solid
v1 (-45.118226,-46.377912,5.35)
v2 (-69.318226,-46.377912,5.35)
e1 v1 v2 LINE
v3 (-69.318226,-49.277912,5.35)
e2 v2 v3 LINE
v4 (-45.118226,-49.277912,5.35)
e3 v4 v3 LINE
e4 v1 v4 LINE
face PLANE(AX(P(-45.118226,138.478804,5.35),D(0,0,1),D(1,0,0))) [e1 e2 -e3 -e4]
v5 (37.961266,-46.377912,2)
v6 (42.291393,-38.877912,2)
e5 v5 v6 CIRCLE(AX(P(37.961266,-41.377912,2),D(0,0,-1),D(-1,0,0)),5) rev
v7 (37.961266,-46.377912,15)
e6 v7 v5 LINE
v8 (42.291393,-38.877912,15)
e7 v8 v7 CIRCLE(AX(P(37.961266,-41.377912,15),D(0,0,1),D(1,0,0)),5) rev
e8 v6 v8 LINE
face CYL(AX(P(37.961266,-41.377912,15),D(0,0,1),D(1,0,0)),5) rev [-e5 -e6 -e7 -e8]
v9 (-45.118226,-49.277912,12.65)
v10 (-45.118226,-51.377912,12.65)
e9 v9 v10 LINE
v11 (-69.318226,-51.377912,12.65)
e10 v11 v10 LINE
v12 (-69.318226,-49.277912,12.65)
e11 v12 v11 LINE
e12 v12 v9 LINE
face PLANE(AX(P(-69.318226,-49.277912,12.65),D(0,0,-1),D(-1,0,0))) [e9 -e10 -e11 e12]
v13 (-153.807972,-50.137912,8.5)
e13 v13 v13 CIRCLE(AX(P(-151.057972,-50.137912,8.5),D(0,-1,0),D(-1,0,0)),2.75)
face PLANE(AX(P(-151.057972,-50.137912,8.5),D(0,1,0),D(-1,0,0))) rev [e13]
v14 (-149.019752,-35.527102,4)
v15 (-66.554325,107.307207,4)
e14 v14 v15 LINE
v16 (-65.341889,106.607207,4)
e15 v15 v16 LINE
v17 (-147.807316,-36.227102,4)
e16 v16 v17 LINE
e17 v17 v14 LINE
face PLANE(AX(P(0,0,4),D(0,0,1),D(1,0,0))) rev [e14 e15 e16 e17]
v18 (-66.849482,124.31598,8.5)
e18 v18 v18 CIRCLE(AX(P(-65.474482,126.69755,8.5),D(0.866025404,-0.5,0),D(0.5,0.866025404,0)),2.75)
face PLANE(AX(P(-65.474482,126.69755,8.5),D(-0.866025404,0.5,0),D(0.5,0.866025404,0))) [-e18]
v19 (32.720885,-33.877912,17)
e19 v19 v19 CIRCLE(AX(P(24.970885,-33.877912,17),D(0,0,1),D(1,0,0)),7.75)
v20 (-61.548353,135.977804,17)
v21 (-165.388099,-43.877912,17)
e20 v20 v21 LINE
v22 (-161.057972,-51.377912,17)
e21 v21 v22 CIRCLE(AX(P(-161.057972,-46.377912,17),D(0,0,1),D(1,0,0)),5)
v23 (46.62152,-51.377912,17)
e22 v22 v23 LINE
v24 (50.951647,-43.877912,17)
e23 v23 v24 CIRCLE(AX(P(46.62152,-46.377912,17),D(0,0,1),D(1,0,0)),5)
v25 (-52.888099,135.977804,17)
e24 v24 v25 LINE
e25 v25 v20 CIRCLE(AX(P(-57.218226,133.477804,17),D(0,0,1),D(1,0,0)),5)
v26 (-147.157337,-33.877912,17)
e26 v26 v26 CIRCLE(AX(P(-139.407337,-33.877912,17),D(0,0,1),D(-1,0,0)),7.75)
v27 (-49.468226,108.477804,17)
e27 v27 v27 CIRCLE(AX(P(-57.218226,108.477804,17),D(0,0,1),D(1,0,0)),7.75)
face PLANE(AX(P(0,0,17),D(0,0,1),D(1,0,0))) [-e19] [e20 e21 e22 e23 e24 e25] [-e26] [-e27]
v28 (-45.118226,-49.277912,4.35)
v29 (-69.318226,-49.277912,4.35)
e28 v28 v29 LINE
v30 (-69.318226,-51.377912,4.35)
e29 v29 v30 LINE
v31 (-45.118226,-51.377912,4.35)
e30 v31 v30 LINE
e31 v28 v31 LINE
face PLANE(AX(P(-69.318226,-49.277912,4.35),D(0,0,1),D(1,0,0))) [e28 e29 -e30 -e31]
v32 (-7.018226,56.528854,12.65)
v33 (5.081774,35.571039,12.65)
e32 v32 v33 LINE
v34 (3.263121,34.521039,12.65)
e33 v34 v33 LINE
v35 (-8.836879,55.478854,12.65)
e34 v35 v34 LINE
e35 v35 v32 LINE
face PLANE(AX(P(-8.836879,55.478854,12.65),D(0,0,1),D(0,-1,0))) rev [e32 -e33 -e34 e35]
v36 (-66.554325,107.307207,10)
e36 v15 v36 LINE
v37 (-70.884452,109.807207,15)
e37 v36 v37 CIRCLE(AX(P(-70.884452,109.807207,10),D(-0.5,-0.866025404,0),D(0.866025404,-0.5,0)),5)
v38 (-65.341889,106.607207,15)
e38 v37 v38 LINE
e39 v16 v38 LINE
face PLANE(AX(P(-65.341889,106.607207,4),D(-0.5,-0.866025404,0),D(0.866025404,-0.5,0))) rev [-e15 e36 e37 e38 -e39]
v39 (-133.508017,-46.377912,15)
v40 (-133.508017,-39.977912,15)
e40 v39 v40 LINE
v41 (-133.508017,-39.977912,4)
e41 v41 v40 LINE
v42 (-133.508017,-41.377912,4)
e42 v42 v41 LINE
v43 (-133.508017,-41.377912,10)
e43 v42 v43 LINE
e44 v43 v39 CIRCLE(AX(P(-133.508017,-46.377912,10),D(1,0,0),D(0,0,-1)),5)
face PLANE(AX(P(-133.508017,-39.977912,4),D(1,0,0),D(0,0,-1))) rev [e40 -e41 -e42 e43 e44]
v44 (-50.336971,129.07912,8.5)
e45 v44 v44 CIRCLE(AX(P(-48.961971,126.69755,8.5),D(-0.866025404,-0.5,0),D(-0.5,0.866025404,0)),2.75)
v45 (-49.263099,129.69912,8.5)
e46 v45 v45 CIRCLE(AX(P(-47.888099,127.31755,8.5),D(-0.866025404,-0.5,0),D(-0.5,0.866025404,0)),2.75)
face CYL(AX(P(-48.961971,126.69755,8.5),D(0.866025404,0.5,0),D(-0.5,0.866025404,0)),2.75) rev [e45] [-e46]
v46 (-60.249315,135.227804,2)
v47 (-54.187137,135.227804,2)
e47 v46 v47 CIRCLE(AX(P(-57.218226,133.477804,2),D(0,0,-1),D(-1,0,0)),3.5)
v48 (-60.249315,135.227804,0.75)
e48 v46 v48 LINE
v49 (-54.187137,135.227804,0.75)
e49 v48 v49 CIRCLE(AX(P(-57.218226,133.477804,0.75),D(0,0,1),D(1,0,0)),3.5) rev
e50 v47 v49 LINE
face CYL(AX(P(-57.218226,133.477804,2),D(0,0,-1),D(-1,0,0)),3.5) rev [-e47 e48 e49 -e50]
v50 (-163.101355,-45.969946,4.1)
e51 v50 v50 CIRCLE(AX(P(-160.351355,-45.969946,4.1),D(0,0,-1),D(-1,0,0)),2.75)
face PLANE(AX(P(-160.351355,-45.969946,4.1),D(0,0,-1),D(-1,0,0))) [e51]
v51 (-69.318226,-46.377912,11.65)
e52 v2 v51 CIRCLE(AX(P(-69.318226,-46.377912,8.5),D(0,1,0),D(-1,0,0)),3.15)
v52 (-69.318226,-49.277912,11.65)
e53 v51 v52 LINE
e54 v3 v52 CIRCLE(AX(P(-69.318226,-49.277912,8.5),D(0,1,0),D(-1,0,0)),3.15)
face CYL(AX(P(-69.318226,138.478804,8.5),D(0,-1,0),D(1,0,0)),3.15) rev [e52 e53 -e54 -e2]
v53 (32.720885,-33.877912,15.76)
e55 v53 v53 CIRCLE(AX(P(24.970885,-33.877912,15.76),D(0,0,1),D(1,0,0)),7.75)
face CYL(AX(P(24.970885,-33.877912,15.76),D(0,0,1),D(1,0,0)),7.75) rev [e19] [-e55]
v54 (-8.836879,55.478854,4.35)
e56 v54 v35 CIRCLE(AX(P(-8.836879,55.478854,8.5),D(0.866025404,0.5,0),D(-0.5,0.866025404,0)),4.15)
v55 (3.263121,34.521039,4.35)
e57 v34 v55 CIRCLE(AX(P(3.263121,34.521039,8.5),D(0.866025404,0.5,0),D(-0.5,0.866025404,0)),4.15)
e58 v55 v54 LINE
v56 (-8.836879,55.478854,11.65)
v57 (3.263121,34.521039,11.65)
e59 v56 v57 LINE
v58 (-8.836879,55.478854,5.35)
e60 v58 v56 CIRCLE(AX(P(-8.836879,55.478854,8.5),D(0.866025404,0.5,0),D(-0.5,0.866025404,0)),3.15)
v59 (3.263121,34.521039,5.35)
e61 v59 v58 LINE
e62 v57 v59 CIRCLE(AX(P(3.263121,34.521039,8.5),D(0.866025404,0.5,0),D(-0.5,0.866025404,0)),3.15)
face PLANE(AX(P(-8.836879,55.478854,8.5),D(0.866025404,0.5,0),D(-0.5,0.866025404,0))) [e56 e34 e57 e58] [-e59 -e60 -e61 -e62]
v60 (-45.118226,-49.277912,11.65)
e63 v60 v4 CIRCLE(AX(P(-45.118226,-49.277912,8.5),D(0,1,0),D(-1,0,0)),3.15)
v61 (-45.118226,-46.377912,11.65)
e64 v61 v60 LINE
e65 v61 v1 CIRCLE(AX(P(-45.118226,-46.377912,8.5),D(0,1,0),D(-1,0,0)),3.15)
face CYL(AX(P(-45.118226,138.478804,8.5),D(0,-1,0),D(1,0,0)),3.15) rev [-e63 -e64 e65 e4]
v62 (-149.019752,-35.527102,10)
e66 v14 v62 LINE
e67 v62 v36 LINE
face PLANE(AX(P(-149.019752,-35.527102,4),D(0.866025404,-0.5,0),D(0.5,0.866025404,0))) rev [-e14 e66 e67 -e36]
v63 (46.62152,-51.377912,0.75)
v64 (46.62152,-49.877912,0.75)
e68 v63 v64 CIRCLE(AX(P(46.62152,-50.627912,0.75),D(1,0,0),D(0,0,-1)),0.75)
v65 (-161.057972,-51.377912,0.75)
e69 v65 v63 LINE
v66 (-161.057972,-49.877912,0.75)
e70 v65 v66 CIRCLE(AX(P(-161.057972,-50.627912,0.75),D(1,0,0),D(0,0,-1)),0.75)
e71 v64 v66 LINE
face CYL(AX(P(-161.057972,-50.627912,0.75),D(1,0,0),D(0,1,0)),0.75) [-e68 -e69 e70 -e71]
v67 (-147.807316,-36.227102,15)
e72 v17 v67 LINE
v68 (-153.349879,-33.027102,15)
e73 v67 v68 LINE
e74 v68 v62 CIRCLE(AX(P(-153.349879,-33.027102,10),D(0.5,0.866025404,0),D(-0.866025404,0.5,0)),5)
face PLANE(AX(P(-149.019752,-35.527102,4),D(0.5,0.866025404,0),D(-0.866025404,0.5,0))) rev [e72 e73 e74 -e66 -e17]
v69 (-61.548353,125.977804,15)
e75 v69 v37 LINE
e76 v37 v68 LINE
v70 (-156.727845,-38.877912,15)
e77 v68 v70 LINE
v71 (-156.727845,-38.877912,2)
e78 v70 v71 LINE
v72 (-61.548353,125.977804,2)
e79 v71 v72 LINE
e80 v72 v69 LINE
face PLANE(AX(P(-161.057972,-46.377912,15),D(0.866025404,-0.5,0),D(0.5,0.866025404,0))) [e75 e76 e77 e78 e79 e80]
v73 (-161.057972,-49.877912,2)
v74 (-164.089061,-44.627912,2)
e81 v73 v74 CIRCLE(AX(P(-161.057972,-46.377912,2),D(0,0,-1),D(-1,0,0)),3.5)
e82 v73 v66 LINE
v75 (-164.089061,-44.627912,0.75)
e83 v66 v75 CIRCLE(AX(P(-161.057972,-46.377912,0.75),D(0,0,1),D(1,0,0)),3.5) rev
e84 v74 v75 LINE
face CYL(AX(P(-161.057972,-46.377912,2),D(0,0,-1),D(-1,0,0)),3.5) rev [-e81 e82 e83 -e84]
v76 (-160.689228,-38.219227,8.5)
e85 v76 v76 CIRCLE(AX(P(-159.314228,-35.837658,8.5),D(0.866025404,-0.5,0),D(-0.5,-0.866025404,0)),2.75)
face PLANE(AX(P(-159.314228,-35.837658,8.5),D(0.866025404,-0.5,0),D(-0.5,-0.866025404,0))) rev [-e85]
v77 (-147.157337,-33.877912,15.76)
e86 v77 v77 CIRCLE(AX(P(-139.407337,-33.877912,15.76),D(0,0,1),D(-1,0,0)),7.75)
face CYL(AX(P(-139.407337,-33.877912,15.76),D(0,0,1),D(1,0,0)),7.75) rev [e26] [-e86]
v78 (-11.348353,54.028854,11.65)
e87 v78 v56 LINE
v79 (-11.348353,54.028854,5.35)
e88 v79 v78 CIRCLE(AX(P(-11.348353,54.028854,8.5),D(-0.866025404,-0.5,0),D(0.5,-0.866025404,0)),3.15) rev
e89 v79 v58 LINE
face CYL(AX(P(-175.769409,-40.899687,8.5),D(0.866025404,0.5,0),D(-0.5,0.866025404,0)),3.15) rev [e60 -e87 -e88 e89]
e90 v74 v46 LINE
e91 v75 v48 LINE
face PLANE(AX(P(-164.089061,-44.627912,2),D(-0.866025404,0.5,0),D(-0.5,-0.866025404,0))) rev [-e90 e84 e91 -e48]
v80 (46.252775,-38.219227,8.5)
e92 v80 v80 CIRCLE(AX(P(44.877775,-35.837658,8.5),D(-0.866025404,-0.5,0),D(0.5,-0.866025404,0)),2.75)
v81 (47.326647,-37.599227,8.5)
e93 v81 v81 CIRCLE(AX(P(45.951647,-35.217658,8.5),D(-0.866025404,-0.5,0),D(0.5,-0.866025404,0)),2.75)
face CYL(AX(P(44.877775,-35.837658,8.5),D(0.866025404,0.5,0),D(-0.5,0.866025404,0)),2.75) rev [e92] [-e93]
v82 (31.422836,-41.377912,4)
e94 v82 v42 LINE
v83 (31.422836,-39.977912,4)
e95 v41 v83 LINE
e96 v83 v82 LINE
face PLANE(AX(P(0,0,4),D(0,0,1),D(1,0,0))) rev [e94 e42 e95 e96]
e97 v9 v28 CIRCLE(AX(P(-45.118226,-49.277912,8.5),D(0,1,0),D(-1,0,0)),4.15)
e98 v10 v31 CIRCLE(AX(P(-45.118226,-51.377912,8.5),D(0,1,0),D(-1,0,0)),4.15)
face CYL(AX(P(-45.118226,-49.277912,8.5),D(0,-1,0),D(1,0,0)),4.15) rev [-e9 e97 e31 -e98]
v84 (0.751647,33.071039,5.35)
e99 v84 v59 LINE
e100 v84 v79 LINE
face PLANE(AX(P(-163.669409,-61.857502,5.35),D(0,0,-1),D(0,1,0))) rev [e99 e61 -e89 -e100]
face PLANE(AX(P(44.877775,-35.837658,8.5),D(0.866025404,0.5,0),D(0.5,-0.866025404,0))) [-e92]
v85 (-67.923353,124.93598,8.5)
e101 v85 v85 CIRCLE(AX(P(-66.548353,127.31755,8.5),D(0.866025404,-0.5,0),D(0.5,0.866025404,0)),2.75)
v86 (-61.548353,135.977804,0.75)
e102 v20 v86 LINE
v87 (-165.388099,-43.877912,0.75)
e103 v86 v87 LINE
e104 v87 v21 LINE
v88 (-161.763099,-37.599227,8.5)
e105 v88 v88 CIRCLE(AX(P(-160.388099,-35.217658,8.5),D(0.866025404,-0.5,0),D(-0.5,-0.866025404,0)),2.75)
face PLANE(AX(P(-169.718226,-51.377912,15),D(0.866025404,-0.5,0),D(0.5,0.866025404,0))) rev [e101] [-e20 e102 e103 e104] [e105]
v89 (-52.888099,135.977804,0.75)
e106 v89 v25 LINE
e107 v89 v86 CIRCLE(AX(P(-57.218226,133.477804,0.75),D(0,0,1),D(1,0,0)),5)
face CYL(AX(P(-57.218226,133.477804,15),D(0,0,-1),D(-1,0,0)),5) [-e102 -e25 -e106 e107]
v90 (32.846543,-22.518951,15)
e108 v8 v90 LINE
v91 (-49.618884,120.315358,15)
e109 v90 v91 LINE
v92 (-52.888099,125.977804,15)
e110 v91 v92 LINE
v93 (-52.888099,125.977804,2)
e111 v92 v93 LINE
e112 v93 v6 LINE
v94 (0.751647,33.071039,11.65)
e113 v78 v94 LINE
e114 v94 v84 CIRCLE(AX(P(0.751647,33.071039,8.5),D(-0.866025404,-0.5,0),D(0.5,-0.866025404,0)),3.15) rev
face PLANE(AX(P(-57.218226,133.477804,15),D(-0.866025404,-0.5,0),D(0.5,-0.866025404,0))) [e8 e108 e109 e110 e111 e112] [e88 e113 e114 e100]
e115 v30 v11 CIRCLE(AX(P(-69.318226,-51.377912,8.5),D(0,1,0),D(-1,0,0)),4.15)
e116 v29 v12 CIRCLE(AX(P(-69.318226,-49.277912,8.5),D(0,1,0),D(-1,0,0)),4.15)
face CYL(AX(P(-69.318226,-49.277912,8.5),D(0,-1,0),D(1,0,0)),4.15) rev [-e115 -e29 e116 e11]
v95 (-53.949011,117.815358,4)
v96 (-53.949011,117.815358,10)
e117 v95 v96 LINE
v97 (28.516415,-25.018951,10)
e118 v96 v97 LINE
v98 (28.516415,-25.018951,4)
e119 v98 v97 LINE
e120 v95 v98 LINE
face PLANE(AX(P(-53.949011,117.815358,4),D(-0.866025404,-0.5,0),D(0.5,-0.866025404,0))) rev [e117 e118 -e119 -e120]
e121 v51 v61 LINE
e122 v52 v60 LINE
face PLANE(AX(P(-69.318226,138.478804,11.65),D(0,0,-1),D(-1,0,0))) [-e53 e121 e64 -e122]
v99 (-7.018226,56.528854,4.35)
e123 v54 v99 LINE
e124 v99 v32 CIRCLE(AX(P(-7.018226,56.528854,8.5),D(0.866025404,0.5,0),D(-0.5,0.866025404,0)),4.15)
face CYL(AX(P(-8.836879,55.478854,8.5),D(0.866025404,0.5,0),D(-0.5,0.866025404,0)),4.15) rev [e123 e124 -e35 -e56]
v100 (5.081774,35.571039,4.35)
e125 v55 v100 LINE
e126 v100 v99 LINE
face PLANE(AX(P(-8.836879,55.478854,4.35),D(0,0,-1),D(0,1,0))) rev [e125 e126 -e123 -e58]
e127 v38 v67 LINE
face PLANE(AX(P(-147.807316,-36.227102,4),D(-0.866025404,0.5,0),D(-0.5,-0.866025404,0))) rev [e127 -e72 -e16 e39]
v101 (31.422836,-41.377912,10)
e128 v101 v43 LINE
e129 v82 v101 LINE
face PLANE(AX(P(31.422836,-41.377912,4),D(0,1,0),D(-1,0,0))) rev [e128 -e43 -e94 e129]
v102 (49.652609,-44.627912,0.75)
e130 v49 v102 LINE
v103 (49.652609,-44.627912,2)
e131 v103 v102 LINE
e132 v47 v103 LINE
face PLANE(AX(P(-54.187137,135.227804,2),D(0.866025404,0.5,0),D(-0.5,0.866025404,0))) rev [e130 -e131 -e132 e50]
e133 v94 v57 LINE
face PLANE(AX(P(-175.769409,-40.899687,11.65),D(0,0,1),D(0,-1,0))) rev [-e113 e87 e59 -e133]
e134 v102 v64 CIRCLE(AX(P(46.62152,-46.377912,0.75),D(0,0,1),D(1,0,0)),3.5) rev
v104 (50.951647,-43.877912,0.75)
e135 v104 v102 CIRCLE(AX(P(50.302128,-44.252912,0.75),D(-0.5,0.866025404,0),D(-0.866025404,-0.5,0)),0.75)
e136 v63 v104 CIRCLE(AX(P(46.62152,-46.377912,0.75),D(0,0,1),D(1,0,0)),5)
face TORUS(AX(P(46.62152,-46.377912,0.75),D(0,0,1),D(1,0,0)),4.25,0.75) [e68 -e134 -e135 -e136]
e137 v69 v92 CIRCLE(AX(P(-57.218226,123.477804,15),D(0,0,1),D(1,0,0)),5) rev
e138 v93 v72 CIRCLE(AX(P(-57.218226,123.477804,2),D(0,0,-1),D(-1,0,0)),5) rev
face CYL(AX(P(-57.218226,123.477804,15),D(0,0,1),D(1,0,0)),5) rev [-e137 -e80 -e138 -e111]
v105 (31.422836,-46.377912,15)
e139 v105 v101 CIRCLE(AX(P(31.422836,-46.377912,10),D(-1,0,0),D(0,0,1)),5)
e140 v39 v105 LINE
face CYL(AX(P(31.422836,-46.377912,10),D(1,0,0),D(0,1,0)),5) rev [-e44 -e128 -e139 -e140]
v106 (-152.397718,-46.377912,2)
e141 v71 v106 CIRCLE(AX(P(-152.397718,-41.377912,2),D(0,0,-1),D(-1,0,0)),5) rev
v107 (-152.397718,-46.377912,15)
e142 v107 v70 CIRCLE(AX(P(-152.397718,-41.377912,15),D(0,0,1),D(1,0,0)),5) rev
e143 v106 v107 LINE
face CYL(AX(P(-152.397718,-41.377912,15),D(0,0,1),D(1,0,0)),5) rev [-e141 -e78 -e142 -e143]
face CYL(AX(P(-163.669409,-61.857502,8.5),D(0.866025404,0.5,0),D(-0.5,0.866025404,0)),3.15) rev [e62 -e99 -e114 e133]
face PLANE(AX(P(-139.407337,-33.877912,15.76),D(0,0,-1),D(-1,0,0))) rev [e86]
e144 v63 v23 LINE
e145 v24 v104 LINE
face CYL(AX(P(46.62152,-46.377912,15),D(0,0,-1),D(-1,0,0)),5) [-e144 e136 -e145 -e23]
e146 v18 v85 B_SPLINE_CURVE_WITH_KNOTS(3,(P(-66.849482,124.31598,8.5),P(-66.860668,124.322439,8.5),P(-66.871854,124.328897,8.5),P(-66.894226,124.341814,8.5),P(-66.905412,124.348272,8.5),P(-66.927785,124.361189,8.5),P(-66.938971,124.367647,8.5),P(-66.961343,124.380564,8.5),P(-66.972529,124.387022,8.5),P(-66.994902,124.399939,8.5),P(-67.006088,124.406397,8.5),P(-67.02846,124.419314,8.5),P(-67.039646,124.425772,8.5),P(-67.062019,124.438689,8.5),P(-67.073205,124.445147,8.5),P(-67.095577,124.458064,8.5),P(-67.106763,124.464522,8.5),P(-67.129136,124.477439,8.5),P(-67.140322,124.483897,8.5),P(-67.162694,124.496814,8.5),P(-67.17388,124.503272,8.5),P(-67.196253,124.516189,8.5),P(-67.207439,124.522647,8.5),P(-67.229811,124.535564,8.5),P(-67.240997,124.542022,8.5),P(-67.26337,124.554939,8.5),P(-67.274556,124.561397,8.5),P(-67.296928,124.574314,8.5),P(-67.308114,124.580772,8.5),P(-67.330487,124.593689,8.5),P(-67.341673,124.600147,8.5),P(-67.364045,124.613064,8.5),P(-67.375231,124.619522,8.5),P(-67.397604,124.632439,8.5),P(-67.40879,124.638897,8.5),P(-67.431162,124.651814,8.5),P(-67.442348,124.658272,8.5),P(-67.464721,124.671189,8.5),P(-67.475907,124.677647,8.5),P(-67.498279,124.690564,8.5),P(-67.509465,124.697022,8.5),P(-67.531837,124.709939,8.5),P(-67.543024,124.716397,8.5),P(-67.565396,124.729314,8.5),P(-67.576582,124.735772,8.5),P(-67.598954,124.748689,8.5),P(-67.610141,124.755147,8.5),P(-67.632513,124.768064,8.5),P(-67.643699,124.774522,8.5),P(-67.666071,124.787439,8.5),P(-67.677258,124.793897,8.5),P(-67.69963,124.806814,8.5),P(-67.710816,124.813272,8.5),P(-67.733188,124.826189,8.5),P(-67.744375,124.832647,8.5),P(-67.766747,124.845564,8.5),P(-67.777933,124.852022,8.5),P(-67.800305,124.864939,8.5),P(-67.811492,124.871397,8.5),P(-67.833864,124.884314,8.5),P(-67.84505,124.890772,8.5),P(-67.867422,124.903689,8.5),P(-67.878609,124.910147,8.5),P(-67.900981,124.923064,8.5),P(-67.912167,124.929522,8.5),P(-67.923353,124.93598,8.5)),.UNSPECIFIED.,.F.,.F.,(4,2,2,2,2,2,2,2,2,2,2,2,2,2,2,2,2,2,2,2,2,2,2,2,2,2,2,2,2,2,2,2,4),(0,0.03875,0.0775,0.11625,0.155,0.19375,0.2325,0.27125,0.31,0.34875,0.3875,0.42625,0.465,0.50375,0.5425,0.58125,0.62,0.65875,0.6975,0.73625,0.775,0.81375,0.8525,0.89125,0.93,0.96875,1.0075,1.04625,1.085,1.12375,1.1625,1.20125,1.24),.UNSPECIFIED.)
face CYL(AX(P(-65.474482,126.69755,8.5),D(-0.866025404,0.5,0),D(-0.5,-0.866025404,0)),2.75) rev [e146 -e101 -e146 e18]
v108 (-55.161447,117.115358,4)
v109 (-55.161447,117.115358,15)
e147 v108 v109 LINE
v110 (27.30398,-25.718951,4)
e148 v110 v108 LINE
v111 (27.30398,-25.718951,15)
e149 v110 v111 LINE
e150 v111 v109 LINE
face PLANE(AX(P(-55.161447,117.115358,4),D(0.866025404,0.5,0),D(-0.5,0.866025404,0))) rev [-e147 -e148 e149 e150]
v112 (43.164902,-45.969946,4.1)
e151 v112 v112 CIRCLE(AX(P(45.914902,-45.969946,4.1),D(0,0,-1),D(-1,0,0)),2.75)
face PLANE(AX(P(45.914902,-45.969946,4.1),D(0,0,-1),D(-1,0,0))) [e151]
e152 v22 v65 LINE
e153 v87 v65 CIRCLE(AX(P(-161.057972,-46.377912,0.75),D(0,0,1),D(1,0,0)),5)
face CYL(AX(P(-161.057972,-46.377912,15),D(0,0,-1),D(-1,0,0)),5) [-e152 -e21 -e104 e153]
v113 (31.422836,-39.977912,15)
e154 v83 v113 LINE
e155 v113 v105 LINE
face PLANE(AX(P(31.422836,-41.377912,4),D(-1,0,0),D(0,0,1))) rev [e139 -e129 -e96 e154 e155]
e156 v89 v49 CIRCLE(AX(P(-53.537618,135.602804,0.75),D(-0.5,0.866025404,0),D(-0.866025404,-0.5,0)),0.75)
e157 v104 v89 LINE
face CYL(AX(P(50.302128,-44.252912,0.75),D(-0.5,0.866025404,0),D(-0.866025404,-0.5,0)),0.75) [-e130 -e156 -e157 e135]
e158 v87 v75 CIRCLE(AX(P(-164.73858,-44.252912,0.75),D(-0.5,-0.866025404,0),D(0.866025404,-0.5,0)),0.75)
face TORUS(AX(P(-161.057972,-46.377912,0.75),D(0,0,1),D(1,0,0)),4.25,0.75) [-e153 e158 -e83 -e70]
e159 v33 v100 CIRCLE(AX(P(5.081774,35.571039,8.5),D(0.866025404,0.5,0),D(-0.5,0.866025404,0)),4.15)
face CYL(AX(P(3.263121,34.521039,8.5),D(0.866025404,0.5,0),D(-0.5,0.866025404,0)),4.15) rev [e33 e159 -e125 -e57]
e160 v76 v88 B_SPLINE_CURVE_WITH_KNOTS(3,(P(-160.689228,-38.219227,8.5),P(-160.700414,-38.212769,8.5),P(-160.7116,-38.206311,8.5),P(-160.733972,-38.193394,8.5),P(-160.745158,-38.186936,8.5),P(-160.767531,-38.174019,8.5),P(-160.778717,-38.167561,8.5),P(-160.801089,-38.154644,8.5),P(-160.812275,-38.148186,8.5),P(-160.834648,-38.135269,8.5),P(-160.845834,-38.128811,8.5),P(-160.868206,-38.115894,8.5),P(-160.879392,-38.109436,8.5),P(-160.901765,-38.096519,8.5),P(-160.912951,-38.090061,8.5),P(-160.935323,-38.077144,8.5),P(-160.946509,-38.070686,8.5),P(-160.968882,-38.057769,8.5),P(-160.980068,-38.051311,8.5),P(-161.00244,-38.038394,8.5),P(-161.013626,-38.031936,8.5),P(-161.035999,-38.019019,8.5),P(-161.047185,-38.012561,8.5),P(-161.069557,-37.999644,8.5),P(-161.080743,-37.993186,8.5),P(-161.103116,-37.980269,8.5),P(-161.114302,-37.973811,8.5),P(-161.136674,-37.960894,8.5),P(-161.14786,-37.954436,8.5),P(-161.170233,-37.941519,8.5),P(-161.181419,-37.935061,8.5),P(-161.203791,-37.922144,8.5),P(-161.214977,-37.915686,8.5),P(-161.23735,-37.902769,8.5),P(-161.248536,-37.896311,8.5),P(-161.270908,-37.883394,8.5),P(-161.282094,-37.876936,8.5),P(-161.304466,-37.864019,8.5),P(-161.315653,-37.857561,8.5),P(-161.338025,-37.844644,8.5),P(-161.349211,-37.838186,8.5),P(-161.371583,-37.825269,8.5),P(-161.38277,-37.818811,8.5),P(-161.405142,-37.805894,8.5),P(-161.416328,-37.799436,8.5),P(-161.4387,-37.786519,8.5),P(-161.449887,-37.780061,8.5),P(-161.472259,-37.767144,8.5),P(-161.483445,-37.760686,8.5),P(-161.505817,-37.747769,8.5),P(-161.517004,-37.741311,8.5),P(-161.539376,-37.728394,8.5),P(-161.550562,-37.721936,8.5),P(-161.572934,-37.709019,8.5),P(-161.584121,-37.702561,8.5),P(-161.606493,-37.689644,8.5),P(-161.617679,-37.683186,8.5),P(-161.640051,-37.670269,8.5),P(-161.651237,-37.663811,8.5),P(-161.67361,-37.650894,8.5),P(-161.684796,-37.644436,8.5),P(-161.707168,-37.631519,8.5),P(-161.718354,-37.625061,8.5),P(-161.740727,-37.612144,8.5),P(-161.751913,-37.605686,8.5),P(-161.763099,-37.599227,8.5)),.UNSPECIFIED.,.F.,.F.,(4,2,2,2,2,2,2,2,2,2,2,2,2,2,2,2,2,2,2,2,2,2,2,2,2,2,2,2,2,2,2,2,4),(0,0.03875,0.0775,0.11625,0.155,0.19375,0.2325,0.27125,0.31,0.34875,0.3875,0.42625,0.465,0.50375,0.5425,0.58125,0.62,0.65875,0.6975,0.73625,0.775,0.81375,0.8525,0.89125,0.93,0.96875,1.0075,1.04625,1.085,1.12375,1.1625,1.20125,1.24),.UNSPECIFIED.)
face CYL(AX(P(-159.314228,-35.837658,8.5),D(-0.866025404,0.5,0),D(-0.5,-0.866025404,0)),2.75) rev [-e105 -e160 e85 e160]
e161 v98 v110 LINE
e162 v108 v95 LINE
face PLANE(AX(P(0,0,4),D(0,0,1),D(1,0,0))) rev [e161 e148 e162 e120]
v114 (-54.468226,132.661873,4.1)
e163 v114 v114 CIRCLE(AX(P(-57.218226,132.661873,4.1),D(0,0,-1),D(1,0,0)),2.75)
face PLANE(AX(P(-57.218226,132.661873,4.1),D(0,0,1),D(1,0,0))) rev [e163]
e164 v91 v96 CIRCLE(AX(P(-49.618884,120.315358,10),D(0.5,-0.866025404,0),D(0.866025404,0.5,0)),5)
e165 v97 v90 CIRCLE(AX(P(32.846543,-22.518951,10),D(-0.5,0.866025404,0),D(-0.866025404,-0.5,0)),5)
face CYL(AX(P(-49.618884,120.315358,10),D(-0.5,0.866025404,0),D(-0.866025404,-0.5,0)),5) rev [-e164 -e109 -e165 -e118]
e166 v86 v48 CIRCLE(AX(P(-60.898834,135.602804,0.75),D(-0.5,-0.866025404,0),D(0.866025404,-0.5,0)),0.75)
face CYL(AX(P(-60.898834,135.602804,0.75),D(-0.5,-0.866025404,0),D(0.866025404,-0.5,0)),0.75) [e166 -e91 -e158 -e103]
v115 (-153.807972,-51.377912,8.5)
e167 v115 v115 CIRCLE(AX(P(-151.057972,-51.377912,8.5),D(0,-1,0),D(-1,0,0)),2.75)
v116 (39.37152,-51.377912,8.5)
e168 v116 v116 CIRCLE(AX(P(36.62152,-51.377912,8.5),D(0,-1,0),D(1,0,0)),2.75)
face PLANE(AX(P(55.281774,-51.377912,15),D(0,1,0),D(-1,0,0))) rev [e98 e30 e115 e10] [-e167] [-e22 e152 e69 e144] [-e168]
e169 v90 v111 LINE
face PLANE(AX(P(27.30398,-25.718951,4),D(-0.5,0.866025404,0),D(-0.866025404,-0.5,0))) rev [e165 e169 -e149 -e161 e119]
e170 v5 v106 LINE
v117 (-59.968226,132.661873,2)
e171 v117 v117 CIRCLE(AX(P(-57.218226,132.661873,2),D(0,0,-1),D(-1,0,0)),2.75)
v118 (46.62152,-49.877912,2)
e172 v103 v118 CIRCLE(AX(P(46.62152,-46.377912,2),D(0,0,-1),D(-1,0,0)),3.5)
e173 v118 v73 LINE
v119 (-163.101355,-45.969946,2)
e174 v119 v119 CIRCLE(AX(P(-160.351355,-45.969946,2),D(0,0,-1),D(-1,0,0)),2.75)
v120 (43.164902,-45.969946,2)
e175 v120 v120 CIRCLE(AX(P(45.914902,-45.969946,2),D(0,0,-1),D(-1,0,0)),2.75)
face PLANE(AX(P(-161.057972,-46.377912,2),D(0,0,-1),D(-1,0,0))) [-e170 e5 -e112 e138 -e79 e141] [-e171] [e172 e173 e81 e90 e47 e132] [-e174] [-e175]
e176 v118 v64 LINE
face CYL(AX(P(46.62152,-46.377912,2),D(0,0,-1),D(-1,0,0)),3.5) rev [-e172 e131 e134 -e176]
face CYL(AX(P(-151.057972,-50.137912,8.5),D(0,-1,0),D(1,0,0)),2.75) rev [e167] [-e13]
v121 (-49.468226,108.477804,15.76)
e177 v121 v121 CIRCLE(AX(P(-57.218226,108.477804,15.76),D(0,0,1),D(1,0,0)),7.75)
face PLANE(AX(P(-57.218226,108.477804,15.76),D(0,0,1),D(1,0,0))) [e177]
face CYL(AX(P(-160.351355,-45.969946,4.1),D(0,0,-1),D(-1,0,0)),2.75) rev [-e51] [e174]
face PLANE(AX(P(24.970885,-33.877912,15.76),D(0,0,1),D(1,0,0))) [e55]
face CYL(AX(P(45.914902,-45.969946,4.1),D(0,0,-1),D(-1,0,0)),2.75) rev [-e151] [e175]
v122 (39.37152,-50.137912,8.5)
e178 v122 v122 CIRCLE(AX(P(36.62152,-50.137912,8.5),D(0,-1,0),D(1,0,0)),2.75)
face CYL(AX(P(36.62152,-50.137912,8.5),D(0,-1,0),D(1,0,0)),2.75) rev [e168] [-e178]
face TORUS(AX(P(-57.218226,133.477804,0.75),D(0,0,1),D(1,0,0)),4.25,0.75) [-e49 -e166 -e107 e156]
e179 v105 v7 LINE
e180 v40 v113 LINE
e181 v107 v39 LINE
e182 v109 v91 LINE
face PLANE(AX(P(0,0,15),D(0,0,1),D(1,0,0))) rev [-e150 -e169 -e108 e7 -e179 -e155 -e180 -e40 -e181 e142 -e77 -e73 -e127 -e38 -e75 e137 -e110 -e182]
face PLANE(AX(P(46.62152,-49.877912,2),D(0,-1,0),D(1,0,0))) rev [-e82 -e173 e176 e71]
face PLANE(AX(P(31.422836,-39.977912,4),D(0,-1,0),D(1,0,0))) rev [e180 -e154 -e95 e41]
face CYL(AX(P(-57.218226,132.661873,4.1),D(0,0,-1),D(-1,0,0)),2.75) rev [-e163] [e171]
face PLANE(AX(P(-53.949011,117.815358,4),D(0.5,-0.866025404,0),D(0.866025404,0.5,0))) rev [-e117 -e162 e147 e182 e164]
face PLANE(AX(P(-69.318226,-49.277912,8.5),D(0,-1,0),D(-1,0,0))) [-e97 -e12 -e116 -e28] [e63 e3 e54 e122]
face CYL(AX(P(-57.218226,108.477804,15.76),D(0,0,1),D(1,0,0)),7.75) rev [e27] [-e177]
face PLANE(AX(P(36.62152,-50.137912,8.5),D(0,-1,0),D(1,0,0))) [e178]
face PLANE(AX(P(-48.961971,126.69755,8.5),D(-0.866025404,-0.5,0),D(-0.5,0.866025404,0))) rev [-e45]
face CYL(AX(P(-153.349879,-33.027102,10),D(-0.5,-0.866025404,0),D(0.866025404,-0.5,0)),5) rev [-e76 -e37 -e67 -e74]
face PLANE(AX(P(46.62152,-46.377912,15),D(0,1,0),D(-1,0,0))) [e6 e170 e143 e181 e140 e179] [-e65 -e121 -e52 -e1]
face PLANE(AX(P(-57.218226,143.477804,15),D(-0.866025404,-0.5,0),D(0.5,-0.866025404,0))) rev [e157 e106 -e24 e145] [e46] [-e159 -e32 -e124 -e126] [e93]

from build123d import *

# Parameters (mm, degrees)
BOSS_EXTRU_1_DEPTH      = 15
BOSS_EXTRU_2_DEPTH      = 2
ESQUISSE3_W             = 164.930853143
ESQUISSE3_H             = 1.4
BOSS_EXTRU_3_DEPTH      = 11
ENL_V_MAT_EXTRU_1_DEPTH = 2.1
ENL_V_MAT_EXTRU_2_REACH = 232.446
CONG_1_R                = 5
ESQUISSE6_R             = 7.75
ENL_V_MAT_EXTRU_3_DEPTH = 1.24
ESQUISSE7_R             = 2.75
ENL_V_MAT_EXTRU_4_DEPTH = 1.24
CONG_2_R                = 5
ENL_V_MAT_EXTRU_6_DEPTH = 2
ESQUISSE8_R             = 2.75
ENL_V_MAT_EXTRU_5_DEPTH = 4.1
CONG_3_R                = 0.75


with BuildPart() as part:
    # Esquisse1 → Boss.-Extru.1 (new body)
    with BuildSketch(Plane.XY):
        Polygon((-169.71822613, -51.377911564), (-57.21822613, 143.477804287), (55.28177387, -51.377911564), align=None)
        Polygon((46.621519833, -46.377911564), (-161.057972092, -46.377911564), (-57.21822613, 133.477804287), align=None, mode=Mode.SUBTRACT)
    extrude(amount=BOSS_EXTRU_1_DEPTH)

    # Esquisse2 → Boss.-Extru.2 (add)
    with BuildSketch(Plane.XY.offset(15)):
        Polygon((-57.21822613, 143.477804287), (-169.71822613, -51.377911564), (55.28177387, -51.377911564), align=None)
    extrude(amount=BOSS_EXTRU_2_DEPTH)

    # Esquisse3 → Boss.-Extru.3 (add)
    with BuildSketch(Plane(origin=(0, 0, 15), x_dir=(-1, 0, 0), z_dir=(0, 0, -1))):
        Polygon((53.949011072, 117.815357706), (-28.5164155, -25.018950984), (-27.303979934, -25.718950984), (55.161446637, 117.115357706), align=None)
        Polygon((149.019751584, -35.527102012), (147.807316018, -36.227102012), (65.341889447, 106.607206677), (66.554325012, 107.307206677), align=None)
        with Locations((51.042590893, -40.677911564)):
            Rectangle(ESQUISSE3_W, ESQUISSE3_H)
    extrude(amount=BOSS_EXTRU_3_DEPTH)

    # Esquisse4 → Enlèv. mat.-Extru.1 (cut)
    with BuildSketch(Plane(origin=(19.214042099, 11.093232378, 0), x_dir=(0, 0, -1), z_dir=(0.8660254037844387, 0.5000000000000001, 0))):
        with BuildLine():
            Line((-12.65, 52.464536457), (-12.65, 28.264536457))
            ThreePointArc((-12.65, 28.264536457), (-8.5, 24.114536457), (-4.35, 28.264536457))
            Line((-4.35, 28.264536457), (-4.35, 52.464536457))
            ThreePointArc((-4.35, 52.464536457), (-8.5, 56.614536457), (-12.65, 52.464536457))
        make_face()
    enl_v_mat_extru_1 = extrude(amount=-ENL_V_MAT_EXTRU_1_DEPTH, mode=Mode.SUBTRACT)

    # Esquisse5 → Enlèv. mat.-Extru.2 (cut, up to next)
    with BuildSketch(Plane(origin=(17.395388751, 10.043232378, 0), x_dir=(0, 0, -1), z_dir=(0.8660254037844386, 0.5000000000000003, 0)), mode=Mode.PRIVATE) as enl_v_mat_extru_2_sk1:
        with BuildLine():
            Line((-11.65, 52.464536457), (-11.65, 28.264536457))
            ThreePointArc((-11.65, 28.264536457), (-8.5, 25.114536457), (-5.35, 28.264536457))
            Line((-5.35, 28.264536457), (-5.35, 52.464536457))
            ThreePointArc((-5.35, 52.464536457), (-8.5, 55.614536457), (-11.65, 52.464536457))
        make_face()
    enl_v_mat_extru_2_tool1 = extrude(enl_v_mat_extru_2_sk1.sketch, amount=-ENL_V_MAT_EXTRU_2_REACH, mode=Mode.PRIVATE) & part.part
    enl_v_mat_extru_2 = enl_v_mat_extru_2_tool1.solids().sort_by_distance((-2.786879, 44.999946, 8.5))[0]
    add(enl_v_mat_extru_2, mode=Mode.SUBTRACT)

    # Congé1
    cong_1_edges = [part.edges().sort_by_distance(p)[0] for p in [
        (46.621519833, -46.377911564, 7.5),
        (-57.21822613, 133.477804287, 7.5),
        (-161.057972092, -46.377911564, 7.5),
        (-169.71822613, -51.377911564, 8.5),
        (-57.21822613, 143.477804287, 8.5),
        (55.28177387, -51.377911564, 8.5),
    ]]
    fillet(cong_1_edges, radius=CONG_1_R)

    # Symétrie1: Enlèv. mat.-Extru.1, Enlèv. mat.-Extru.2 across plane
    add(enl_v_mat_extru_1.mirror(Plane(origin=(-8.426844836, -14.595723404, 0), x_dir=(0, 0, 1), z_dir=(0.5000000000000001, 0.8660254037844386, 0))), mode=Mode.SUBTRACT)
    add(enl_v_mat_extru_2.mirror(Plane(origin=(-8.426844836, -14.595723404, 0), x_dir=(0, 0, 1), z_dir=(0.5000000000000001, 0.8660254037844386, 0))), mode=Mode.SUBTRACT)

    # Esquisse6 → Enlèv. mat.-Extru.3 (cut)
    with BuildSketch(Plane.XY.offset(17)):
        with Locations((-57.21822613, 108.477804287)):
            Circle(ESQUISSE6_R)
        with Locations(Location((-139.407336997, -33.877911564, 0), (0, 0, 180))):
            Circle(ESQUISSE6_R)
        with Locations((24.970884738, -33.877911564)):
            Circle(ESQUISSE6_R)
    extrude(amount=-ENL_V_MAT_EXTRU_3_DEPTH, mode=Mode.SUBTRACT)

    # Esquisse7 → Enlèv. mat.-Extru.4 (cut)
    with BuildSketch(Plane.XZ.offset(51.377911564)):
        with Locations((36.621519833, 8.5)):
            Circle(ESQUISSE7_R)
        with Locations(Location((-151.057972092, 8.5, 0), (0, 0, 180))):
            Circle(ESQUISSE7_R)
    enl_v_mat_extru_4 = extrude(amount=-ENL_V_MAT_EXTRU_4_DEPTH, mode=Mode.SUBTRACT)

    # Symétrie2: Enlèv. mat.-Extru.4 across plane
    add(enl_v_mat_extru_4.mirror(Plane(origin=(-8.426844836, -14.595723404, 0), x_dir=(0, 0, 1), z_dir=(0.5000000000000001, 0.8660254037844386, 0))), mode=Mode.SUBTRACT)

    # Symétrie3: Enlèv. mat.-Extru.4 across plane
    add(enl_v_mat_extru_4.mirror(Plane(origin=(-20.182268228, 34.956713983, 0), x_dir=(0, 0, 1), z_dir=(0.5000000000000001, -0.8660254037844387, 0))), mode=Mode.SUBTRACT)

    # Congé2
    cong_2_edges = [part.edges().sort_by_distance(p)[0] for p in [
        (-12.716297786, 46.398203361, 15),
        (-107.787038298, 35.890052333, 15),
        (-51.042590892, -41.377911564, 15),
    ]]
    fillet(cong_2_edges, radius=CONG_2_R - 0.0001)  # a hair under: the kernel refuses the full size

    # Esquisse9 → Enlèv. mat.-Extru.6 (cut)
    with BuildSketch(Plane(origin=(0, 0, 0), x_dir=(-1, 0, 0), z_dir=(0, 0, -1))):
        with BuildLine():
            Line((164.089061005, -44.627911564), (60.249315043, 135.227804287))
            ThreePointArc((60.249315043, 135.227804287), (57.21822613, 136.977804287), (54.187137216, 135.227804287))
            Line((54.187137216, 135.227804287), (-49.652608746, -44.627911564))
            ThreePointArc((-49.652608746, -44.627911564), (-49.652608746, -48.127911564), (-46.621519833, -49.877911564))
            Line((-46.621519833, -49.877911564), (161.057972092, -49.877911564))
            ThreePointArc((161.057972092, -49.877911564), (164.089061005, -48.127911564), (164.089061005, -44.627911564))
        make_face()
    extrude(amount=-ENL_V_MAT_EXTRU_6_DEPTH, mode=Mode.SUBTRACT)

    # Esquisse8 → Enlèv. mat.-Extru.5 (cut)
    with BuildSketch(Plane(origin=(0, 0, 0), x_dir=(-1, 0, 0), z_dir=(0, 0, -1))):
        with Locations((-45.914902423, -45.969945813)):
            Circle(ESQUISSE8_R)
        with Locations((57.21822613, 132.661872783)):
            Circle(ESQUISSE8_R)
        with Locations((160.351354682, -45.969945813)):
            Circle(ESQUISSE8_R)
    extrude(amount=-ENL_V_MAT_EXTRU_5_DEPTH, mode=Mode.SUBTRACT)

    # Congé3
    cong_3_edges = [part.edges().sort_by_distance(p)[0] for p in [
        (-113.46822613, 46.049946361, 0),
        (-57.21822613, -51.377911564, 0),
        (-0.96822613, 46.049946361, 0),
        (50.951646852, -48.877911564, 0),
        (-165.388099111, -48.877911564, 0),
        (-57.21822613, 138.477804287, 0),
        (-112.169188024, 45.299946361, 0),
        (-2.267264235, 45.299946361, 0),
        (-57.21822613, -49.877911564, 0),
    ]]
    fillet(cong_3_edges, radius=CONG_3_R - 0.0001)  # a hair under: the kernel refuses the full size


solid = part.part
